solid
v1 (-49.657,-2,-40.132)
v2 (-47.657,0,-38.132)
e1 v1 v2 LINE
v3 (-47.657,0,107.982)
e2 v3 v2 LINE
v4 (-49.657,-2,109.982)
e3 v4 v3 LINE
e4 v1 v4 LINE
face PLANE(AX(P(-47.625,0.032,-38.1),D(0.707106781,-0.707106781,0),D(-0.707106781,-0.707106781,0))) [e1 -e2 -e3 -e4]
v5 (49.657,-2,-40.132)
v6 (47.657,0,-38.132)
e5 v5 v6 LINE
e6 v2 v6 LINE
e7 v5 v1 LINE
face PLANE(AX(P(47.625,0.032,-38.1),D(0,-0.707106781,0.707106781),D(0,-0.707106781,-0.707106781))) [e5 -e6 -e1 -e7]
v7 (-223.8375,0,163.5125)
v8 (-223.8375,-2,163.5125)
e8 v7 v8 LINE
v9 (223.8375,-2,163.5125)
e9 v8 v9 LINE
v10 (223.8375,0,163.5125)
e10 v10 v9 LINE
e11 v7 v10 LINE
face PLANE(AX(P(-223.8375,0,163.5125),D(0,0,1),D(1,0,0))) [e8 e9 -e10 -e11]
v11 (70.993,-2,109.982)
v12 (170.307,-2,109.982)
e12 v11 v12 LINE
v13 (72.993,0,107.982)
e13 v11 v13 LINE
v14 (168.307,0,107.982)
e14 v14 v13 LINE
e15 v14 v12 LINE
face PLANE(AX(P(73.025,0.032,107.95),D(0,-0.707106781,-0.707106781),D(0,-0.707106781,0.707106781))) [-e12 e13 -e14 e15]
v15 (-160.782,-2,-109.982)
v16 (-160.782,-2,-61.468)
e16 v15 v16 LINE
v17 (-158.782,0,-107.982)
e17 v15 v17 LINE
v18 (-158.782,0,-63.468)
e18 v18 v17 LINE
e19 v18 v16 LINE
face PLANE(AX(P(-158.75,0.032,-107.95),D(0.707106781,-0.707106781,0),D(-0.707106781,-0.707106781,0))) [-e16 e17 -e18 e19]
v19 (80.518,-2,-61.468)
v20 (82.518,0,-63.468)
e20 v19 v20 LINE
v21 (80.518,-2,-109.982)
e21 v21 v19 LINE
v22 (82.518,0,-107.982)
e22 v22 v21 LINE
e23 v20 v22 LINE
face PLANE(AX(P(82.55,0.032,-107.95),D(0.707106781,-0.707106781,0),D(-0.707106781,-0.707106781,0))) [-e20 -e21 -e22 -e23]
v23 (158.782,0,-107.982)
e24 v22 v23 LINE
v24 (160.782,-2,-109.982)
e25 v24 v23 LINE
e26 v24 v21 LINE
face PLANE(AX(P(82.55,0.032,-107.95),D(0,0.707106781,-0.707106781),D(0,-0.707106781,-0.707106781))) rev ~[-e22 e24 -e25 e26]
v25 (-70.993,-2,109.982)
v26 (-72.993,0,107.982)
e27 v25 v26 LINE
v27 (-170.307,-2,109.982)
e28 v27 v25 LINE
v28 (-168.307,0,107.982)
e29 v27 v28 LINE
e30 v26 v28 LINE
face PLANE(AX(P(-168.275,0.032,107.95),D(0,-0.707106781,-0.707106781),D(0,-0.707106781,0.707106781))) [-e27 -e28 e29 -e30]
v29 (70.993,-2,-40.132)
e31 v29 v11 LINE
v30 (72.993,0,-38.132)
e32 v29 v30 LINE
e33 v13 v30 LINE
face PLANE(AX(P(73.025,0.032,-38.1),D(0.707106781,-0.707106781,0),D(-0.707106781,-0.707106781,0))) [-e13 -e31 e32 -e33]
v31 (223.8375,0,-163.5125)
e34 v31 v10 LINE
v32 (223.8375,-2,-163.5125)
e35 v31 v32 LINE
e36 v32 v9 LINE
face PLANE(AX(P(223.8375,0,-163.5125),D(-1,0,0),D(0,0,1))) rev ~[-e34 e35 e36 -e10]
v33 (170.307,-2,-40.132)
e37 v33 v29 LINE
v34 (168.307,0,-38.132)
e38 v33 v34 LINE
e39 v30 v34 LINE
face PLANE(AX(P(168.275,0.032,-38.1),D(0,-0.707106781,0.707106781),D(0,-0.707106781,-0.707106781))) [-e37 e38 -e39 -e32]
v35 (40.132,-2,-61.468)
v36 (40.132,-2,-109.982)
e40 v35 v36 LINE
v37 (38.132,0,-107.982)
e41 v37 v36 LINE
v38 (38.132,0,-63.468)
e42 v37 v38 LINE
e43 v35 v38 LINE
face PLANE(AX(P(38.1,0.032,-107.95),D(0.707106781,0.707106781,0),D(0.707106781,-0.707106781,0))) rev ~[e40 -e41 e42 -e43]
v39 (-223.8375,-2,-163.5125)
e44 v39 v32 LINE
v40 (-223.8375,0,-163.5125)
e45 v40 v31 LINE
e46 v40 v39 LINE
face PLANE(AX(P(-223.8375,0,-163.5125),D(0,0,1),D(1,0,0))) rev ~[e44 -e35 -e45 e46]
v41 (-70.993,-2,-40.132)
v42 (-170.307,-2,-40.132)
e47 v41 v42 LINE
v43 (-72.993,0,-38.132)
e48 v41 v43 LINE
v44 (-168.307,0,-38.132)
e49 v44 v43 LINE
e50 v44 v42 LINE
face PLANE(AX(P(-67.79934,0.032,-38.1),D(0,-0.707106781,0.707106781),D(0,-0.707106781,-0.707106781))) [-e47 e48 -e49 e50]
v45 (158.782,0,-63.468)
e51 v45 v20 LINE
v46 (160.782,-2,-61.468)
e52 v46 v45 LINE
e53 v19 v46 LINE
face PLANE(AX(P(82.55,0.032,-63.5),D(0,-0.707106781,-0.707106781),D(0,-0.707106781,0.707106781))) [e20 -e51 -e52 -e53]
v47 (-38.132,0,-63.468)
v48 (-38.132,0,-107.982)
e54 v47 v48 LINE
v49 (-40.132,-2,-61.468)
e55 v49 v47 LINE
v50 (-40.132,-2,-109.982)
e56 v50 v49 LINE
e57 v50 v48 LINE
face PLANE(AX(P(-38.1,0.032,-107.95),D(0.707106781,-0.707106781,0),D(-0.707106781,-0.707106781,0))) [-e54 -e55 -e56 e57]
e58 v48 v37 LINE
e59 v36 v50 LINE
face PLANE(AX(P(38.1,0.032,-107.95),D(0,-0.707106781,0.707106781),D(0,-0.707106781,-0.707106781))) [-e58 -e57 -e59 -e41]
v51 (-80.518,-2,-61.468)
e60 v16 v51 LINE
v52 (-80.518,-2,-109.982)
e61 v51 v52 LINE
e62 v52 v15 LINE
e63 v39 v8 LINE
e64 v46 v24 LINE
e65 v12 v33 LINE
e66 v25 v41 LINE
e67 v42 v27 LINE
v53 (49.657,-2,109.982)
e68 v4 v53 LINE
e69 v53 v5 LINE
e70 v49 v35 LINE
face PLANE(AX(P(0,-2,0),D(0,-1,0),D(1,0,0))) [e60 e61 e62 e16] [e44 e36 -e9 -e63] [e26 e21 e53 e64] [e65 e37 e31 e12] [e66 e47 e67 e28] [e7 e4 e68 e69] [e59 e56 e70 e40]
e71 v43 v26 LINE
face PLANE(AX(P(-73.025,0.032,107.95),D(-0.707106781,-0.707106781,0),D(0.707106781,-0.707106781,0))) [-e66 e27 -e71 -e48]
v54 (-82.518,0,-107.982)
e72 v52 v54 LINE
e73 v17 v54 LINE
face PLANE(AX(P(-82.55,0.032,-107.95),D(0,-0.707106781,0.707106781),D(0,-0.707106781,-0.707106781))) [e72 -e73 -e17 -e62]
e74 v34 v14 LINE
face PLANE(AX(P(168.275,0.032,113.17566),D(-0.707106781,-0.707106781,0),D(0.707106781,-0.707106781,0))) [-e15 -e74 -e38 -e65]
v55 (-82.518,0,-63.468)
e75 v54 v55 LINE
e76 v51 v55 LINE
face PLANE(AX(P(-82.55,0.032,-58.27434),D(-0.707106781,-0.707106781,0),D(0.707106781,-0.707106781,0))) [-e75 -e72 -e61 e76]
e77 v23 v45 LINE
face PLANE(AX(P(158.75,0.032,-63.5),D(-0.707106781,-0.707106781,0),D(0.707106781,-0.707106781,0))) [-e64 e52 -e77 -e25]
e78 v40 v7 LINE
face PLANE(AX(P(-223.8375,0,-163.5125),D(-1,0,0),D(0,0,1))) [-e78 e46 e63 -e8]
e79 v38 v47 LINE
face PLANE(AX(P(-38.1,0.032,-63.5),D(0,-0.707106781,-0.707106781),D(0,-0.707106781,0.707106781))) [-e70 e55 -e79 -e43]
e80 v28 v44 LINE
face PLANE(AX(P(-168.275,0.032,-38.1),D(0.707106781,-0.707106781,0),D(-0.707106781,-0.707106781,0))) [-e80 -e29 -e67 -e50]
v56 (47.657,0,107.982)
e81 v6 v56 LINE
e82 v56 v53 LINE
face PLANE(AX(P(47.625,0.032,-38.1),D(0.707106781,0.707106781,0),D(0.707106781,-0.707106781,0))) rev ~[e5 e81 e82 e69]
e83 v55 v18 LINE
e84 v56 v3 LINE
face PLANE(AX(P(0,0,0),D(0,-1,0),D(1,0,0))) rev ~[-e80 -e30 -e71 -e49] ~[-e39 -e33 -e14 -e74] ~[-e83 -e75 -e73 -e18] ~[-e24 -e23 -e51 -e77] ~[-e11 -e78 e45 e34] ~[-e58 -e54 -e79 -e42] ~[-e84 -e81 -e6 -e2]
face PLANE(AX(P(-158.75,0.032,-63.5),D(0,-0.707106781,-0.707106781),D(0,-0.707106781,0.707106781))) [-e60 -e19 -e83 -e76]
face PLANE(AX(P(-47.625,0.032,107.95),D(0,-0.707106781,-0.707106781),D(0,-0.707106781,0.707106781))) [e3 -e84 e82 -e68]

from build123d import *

# Parameters (mm, degrees)
F0_W          = 447.675
F0_H          = 327.025
F0_W_2        = 76.2
F0_H_2        = 44.45
F0_W_3        = 95.25
F0_H_3        = 146.05
F1_DEPTH      = 2
F2_T1_DEPTH   = 95.25
F2_T3_DEPTH   = 146.05
F2_T5_DEPTH   = 95.25
F2_T7_DEPTH   = 95.25
F2_T9_DEPTH   = 76.2
F2_T11_DEPTH  = 44.45
F2_T13_DEPTH  = 76.2
F2_T15_DEPTH  = 76.2
F2_T21_DEPTH  = 151.2756598315
F2_T25_DEPTH  = 100.4756598315
F2_T32_DEPTH  = 100.4756598315
F2_T36_DEPTH  = 151.2756598315
F2_T43_DEPTH  = 151.2756598315
F2_T47_DEPTH  = 100.4756598315
F2_T54_DEPTH  = 151.2756598315
F2_T58_DEPTH  = 100.4756598315
F2_T65_DEPTH  = 151.2756598315
F2_T69_DEPTH  = 100.4756598315
F2_T76_DEPTH  = 151.2756598315
F2_T80_DEPTH  = 100.4756598315
F2_T87_DEPTH  = 100.4756598315
F2_T91_DEPTH  = 151.2756598315
F2_T98_DEPTH  = 151.2756598315
F2_T102_DEPTH = 100.4756598315
F2_T109_DEPTH = 151.2756598315
F2_T113_DEPTH = 100.4756598315
F2_T120_DEPTH = 100.4756598315
F2_T124_DEPTH = 151.2756598315
F2_T131_DEPTH = 151.2756598315
F2_T135_DEPTH = 100.4756598315
F2_T142_DEPTH = 151.2756598315
F2_T146_DEPTH = 100.4756598315
F2_T153_DEPTH = 49.6756598315
F2_T157_DEPTH = 81.4256598315
F2_T164_DEPTH = 81.4256598315
F2_T168_DEPTH = 49.6756598315
F2_T175_DEPTH = 49.6756598315
F2_T179_DEPTH = 81.4256598315
F2_T186_DEPTH = 49.6756598315
F2_T190_DEPTH = 81.4256598315
F2_T197_DEPTH = 81.4256598315
F2_T201_DEPTH = 49.6756598315
F2_T208_DEPTH = 81.4256598315
F2_T212_DEPTH = 49.6756598315
F2_T219_DEPTH = 49.6756598315
F2_T223_DEPTH = 81.4256598315
F2_T230_DEPTH = 81.4256598315
F2_T234_DEPTH = 49.6756598315
F2_T241_DEPTH = 49.6756598315
F2_T245_DEPTH = 81.4256598315
F2_T252_DEPTH = 81.4256598315
F2_T256_DEPTH = 49.6756598315
F2_T263_DEPTH = 81.4256598315
F2_T267_DEPTH = 49.6756598315
F2_T274_DEPTH = 81.4256598315
F2_T278_DEPTH = 49.6756598315


# Not quite as in the source:
# - a fillet or chamfer that OpenCascade refuses, or shapes differently, is made with other operations: its cross-section is extruded or revolved along the edge and cut away or added


with BuildPart() as f1:
    # F0 (on Front) → F1 (new body)
    with BuildSketch(Plane.XZ):
        Rectangle(F0_W, F0_H)
        with Locations((-120.65, -85.725)):
            Rectangle(F0_W_2, F0_H_2, mode=Mode.SUBTRACT)
        with Locations((0, -85.725)):
            Rectangle(F0_W_2, F0_H_2, mode=Mode.SUBTRACT)
        with Locations((120.65, -85.725)):
            Rectangle(F0_W_2, F0_H_2, mode=Mode.SUBTRACT)
        with Locations((-120.65, 34.925)):
            Rectangle(F0_W_3, F0_H_3, mode=Mode.SUBTRACT)
        with Locations((0, 34.925)):
            Rectangle(F0_W_3, F0_H_3, mode=Mode.SUBTRACT)
        with Locations((120.65, 34.925)):
            Rectangle(F0_W_3, F0_H_3, mode=Mode.SUBTRACT)
    extrude(amount=F1_DEPTH)

    # F2: chamfer of 2.032 on 24 edges, made by hand

    # F2_s2 → F2_t1 (cut)
    with BuildSketch(Plane.YZ.offset(-168.275)):
        Polygon((0.032, 107.95), (-2, 109.982), (-2, 107.95), align=None)
        Polygon((0.032, -38.1), (-2, -40.132), (-2, -38.1), align=None)
    extrude(amount=F2_T1_DEPTH, mode=Mode.SUBTRACT)

    # F2_s4 → F2_t3 (cut)
    with BuildSketch(Plane.XY.offset(-38.1)):
        Polygon((-168.275, 0.032), (-170.307, -2), (-168.275, -2), align=None)
        Polygon((-73.025, 0.032), (-70.993, -2), (-73.025, -2), align=None)
        Polygon((-47.625, 0.032), (-49.657, -2), (-47.625, -2), align=None)
        Polygon((47.625, 0.032), (49.657, -2), (47.625, -2), align=None)
        Polygon((73.025, 0.032), (70.993, -2), (73.025, -2), align=None)
        Polygon((168.275, 0.032), (170.307, -2), (168.275, -2), align=None)
    extrude(amount=F2_T3_DEPTH, mode=Mode.SUBTRACT)

    # F2_s6 → F2_t5 (cut)
    with BuildSketch(Plane.YZ.offset(-47.625)):
        Polygon((0.032, 107.95), (-2, 109.982), (-2, 107.95), align=None)
        Polygon((0.032, -38.1), (-2, -40.132), (-2, -38.1), align=None)
    extrude(amount=F2_T5_DEPTH, mode=Mode.SUBTRACT)

    # F2_s8 → F2_t7 (cut)
    with BuildSketch(Plane.YZ.offset(73.025)):
        Polygon((0.032, -38.1), (-2, -40.132), (-2, -38.1), align=None)
        Polygon((0.032, 107.95), (-2, 109.982), (-2, 107.95), align=None)
    extrude(amount=F2_T7_DEPTH, mode=Mode.SUBTRACT)

    # F2_s10 → F2_t9 (cut)
    with BuildSketch(Plane.YZ.offset(82.55)):
        Polygon((0.032, -63.5), (-2, -61.468), (-2, -63.5), align=None)
        Polygon((0.032, -107.95), (-2, -109.982), (-2, -107.95), align=None)
    extrude(amount=F2_T9_DEPTH, mode=Mode.SUBTRACT)

    # F2_s12 → F2_t11 (cut)
    with BuildSketch(Plane.XY.offset(-107.95)):
        Polygon((158.75, 0.032), (160.782, -2), (158.75, -2), align=None)
        Polygon((82.55, 0.032), (80.518, -2), (82.55, -2), align=None)
        Polygon((38.1, 0.032), (40.132, -2), (38.1, -2), align=None)
        Polygon((-38.1, 0.032), (-40.132, -2), (-38.1, -2), align=None)
        Polygon((-82.55, 0.032), (-80.518, -2), (-82.55, -2), align=None)
        Polygon((-158.75, 0.032), (-160.782, -2), (-158.75, -2), align=None)
    extrude(amount=F2_T11_DEPTH, mode=Mode.SUBTRACT)

    # F2_s14 → F2_t13 (cut)
    with BuildSketch(Plane.YZ.offset(-38.1)):
        Polygon((0.032, -63.5), (-2, -61.468), (-2, -63.5), align=None)
        Polygon((0.032, -107.95), (-2, -109.982), (-2, -107.95), align=None)
    extrude(amount=F2_T13_DEPTH, mode=Mode.SUBTRACT)

    # F2_s16 → F2_t15 (cut)
    with BuildSketch(Plane.YZ.offset(-158.75)):
        Polygon((0.032, -107.95), (-2, -109.982), (-2, -107.95), align=None)
        Polygon((0.032, -63.5), (-2, -61.468), (-2, -63.5), align=None)
    extrude(amount=F2_T15_DEPTH, mode=Mode.SUBTRACT)


with BuildPart() as f2_tool19:
    # F2_s20 → F2_t21 (new body)
    with BuildSketch(Plane.XY.offset(-38.1)):
        Polygon((-168.275, 0.032), (-170.307, -2), (-168.275, -2), align=None)
    extrude(amount=F2_T21_DEPTH)

    split(bisect_by=Plane.XY.offset(107.95), keep=Keep.TOP)


with BuildPart() as f2_tool23:
    # F2_s24 → F2_t25 (new body)
    with BuildSketch(Plane.YZ.offset(-173.5006598315)):
        Polygon((0.032, 107.95), (-2, 109.982), (-2, 107.95), align=None)
    extrude(amount=F2_T25_DEPTH)

    split(bisect_by=Plane.YZ.offset(-168.275), keep=Keep.BOTTOM)


with BuildPart() as f2_tool19_1:
    add(f2_tool19.part)

    # F2_t27: intersect F2_tool23
    add(f2_tool23.part, mode=Mode.INTERSECT)


with BuildPart() as f1_1:
    add(f1.part)

    # F2_t17: cut F2_tool19
    add(f2_tool19_1.part, mode=Mode.SUBTRACT)


with BuildPart() as f2_tool30:
    # F2_s31 → F2_t32 (new body)
    with BuildSketch(Plane.YZ.offset(-168.275)):
        Polygon((0.032, 107.95), (-2, 109.982), (-2, 107.95), align=None)
    extrude(amount=F2_T32_DEPTH)

    split(bisect_by=Plane.YZ.offset(-73.025), keep=Keep.TOP)


with BuildPart() as f2_tool34:
    # F2_s35 → F2_t36 (new body)
    with BuildSketch(Plane.XY.offset(113.1756598315)):
        Polygon((-73.025, 0.032), (-70.993, -2), (-73.025, -2), align=None)
    extrude(amount=-F2_T36_DEPTH)

    split(bisect_by=Plane.XY.offset(107.95), keep=Keep.TOP)


with BuildPart() as f2_tool30_1:
    add(f2_tool30.part)

    # F2_t38: intersect F2_tool34
    add(f2_tool34.part, mode=Mode.INTERSECT)


with BuildPart() as f1_2:
    add(f1_1.part)

    # F2_t28: cut F2_tool30
    add(f2_tool30_1.part, mode=Mode.SUBTRACT)


with BuildPart() as f2_tool41:
    # F2_s42 → F2_t43 (new body)
    with BuildSketch(Plane.XY.offset(-43.3256598315)):
        Polygon((-168.275, 0.032), (-170.307, -2), (-168.275, -2), align=None)
    extrude(amount=F2_T43_DEPTH)

    split(bisect_by=Plane.XY.offset(-38.1), keep=Keep.BOTTOM)


with BuildPart() as f2_tool45:
    # F2_s46 → F2_t47 (new body)
    with BuildSketch(Plane.YZ.offset(-73.025)):
        Polygon((0.032, -38.1), (-2, -40.132), (-2, -38.1), align=None)
    extrude(amount=-F2_T47_DEPTH)

    split(bisect_by=Plane.YZ.offset(-168.275), keep=Keep.BOTTOM)


with BuildPart() as f2_tool41_1:
    add(f2_tool41.part)

    # F2_t49: intersect F2_tool45
    add(f2_tool45.part, mode=Mode.INTERSECT)


with BuildPart() as f1_3:
    add(f1_2.part)

    # F2_t39: cut F2_tool41
    add(f2_tool41_1.part, mode=Mode.SUBTRACT)


with BuildPart() as f2_tool52:
    # F2_s53 → F2_t54 (new body)
    with BuildSketch(Plane.XY.offset(107.95)):
        Polygon((-73.025, 0.032), (-70.993, -2), (-73.025, -2), align=None)
    extrude(amount=-F2_T54_DEPTH)

    split(bisect_by=Plane.XY.offset(-38.1), keep=Keep.BOTTOM)


with BuildPart() as f2_tool56:
    # F2_s57 → F2_t58 (new body)
    with BuildSketch(Plane.YZ.offset(-67.7993401685)):
        Polygon((0.032, -38.1), (-2, -40.132), (-2, -38.1), align=None)
    extrude(amount=-F2_T58_DEPTH)

    split(bisect_by=Plane.YZ.offset(-73.025), keep=Keep.TOP)


with BuildPart() as f2_tool52_1:
    add(f2_tool52.part)

    # F2_t60: intersect F2_tool56
    add(f2_tool56.part, mode=Mode.INTERSECT)


with BuildPart() as f1_4:
    add(f1_3.part)

    # F2_t50: cut F2_tool52
    add(f2_tool52_1.part, mode=Mode.SUBTRACT)


with BuildPart() as f2_tool63:
    # F2_s64 → F2_t65 (new body)
    with BuildSketch(Plane.XY.offset(-38.1)):
        Polygon((-47.625, 0.032), (-49.657, -2), (-47.625, -2), align=None)
    extrude(amount=F2_T65_DEPTH)

    split(bisect_by=Plane.XY.offset(107.95), keep=Keep.TOP)


with BuildPart() as f2_tool67:
    # F2_s68 → F2_t69 (new body)
    with BuildSketch(Plane.YZ.offset(-52.8506598315)):
        Polygon((0.032, 107.95), (-2, 109.982), (-2, 107.95), align=None)
    extrude(amount=F2_T69_DEPTH)

    split(bisect_by=Plane.YZ.offset(-47.625), keep=Keep.BOTTOM)


with BuildPart() as f2_tool63_1:
    add(f2_tool63.part)

    # F2_t71: intersect F2_tool67
    add(f2_tool67.part, mode=Mode.INTERSECT)


with BuildPart() as f1_5:
    add(f1_4.part)

    # F2_t61: cut F2_tool63
    add(f2_tool63_1.part, mode=Mode.SUBTRACT)


with BuildPart() as f2_tool74:
    # F2_s75 → F2_t76 (new body)
    with BuildSketch(Plane.XY.offset(113.1756598315)):
        Polygon((47.625, 0.032), (49.657, -2), (47.625, -2), align=None)
    extrude(amount=-F2_T76_DEPTH)

    split(bisect_by=Plane.XY.offset(107.95), keep=Keep.TOP)


with BuildPart() as f2_tool78:
    # F2_s79 → F2_t80 (new body)
    with BuildSketch(Plane.YZ.offset(-47.625)):
        Polygon((0.032, 107.95), (-2, 109.982), (-2, 107.95), align=None)
    extrude(amount=F2_T80_DEPTH)

    split(bisect_by=Plane.YZ.offset(47.625), keep=Keep.TOP)


with BuildPart() as f2_tool74_1:
    add(f2_tool74.part)

    # F2_t82: intersect F2_tool78
    add(f2_tool78.part, mode=Mode.INTERSECT)


with BuildPart() as f1_6:
    add(f1_5.part)

    # F2_t72: cut F2_tool74
    add(f2_tool74_1.part, mode=Mode.SUBTRACT)


with BuildPart() as f2_tool85:
    # F2_s86 → F2_t87 (new body)
    with BuildSketch(Plane.YZ.offset(47.625)):
        Polygon((0.032, -38.1), (-2, -40.132), (-2, -38.1), align=None)
    extrude(amount=-F2_T87_DEPTH)

    split(bisect_by=Plane.YZ.offset(-47.625), keep=Keep.BOTTOM)


with BuildPart() as f2_tool89:
    # F2_s90 → F2_t91 (new body)
    with BuildSketch(Plane.XY.offset(-43.3256598315)):
        Polygon((-47.625, 0.032), (-49.657, -2), (-47.625, -2), align=None)
    extrude(amount=F2_T91_DEPTH)

    split(bisect_by=Plane.XY.offset(-38.1), keep=Keep.BOTTOM)


with BuildPart() as f2_tool85_1:
    add(f2_tool85.part)

    # F2_t93: intersect F2_tool89
    add(f2_tool89.part, mode=Mode.INTERSECT)


with BuildPart() as f1_7:
    add(f1_6.part)

    # F2_t83: cut F2_tool85
    add(f2_tool85_1.part, mode=Mode.SUBTRACT)


with BuildPart() as f2_tool96:
    # F2_s97 → F2_t98 (new body)
    with BuildSketch(Plane.XY.offset(107.95)):
        Polygon((47.625, 0.032), (49.657, -2), (47.625, -2), align=None)
    extrude(amount=-F2_T98_DEPTH)

    split(bisect_by=Plane.XY.offset(-38.1), keep=Keep.BOTTOM)


with BuildPart() as f2_tool100:
    # F2_s101 → F2_t102 (new body)
    with BuildSketch(Plane.YZ.offset(52.8506598315)):
        Polygon((0.032, -38.1), (-2, -40.132), (-2, -38.1), align=None)
    extrude(amount=-F2_T102_DEPTH)

    split(bisect_by=Plane.YZ.offset(47.625), keep=Keep.TOP)


with BuildPart() as f2_tool96_1:
    add(f2_tool96.part)

    # F2_t104: intersect F2_tool100
    add(f2_tool100.part, mode=Mode.INTERSECT)


with BuildPart() as f1_8:
    add(f1_7.part)

    # F2_t94: cut F2_tool96
    add(f2_tool96_1.part, mode=Mode.SUBTRACT)


with BuildPart() as f2_tool107:
    # F2_s108 → F2_t109 (new body)
    with BuildSketch(Plane.XY.offset(107.95)):
        Polygon((168.275, 0.032), (170.307, -2), (168.275, -2), align=None)
    extrude(amount=-F2_T109_DEPTH)

    split(bisect_by=Plane.XY.offset(-38.1), keep=Keep.BOTTOM)


with BuildPart() as f2_tool111:
    # F2_s112 → F2_t113 (new body)
    with BuildSketch(Plane.YZ.offset(173.5006598315)):
        Polygon((0.032, -38.1), (-2, -40.132), (-2, -38.1), align=None)
    extrude(amount=-F2_T113_DEPTH)

    split(bisect_by=Plane.YZ.offset(168.275), keep=Keep.TOP)


with BuildPart() as f2_tool107_1:
    add(f2_tool107.part)

    # F2_t115: intersect F2_tool111
    add(f2_tool111.part, mode=Mode.INTERSECT)


with BuildPart() as f1_9:
    add(f1_8.part)

    # F2_t105: cut F2_tool107
    add(f2_tool107_1.part, mode=Mode.SUBTRACT)


with BuildPart() as f2_tool118:
    # F2_s119 → F2_t120 (new body)
    with BuildSketch(Plane.YZ.offset(168.275)):
        Polygon((0.032, -38.1), (-2, -40.132), (-2, -38.1), align=None)
    extrude(amount=-F2_T120_DEPTH)

    split(bisect_by=Plane.YZ.offset(73.025), keep=Keep.BOTTOM)


with BuildPart() as f2_tool122:
    # F2_s123 → F2_t124 (new body)
    with BuildSketch(Plane.XY.offset(-43.3256598315)):
        Polygon((73.025, 0.032), (70.993, -2), (73.025, -2), align=None)
    extrude(amount=F2_T124_DEPTH)

    split(bisect_by=Plane.XY.offset(-38.1), keep=Keep.BOTTOM)


with BuildPart() as f2_tool118_1:
    add(f2_tool118.part)

    # F2_t126: intersect F2_tool122
    add(f2_tool122.part, mode=Mode.INTERSECT)


with BuildPart() as f1_10:
    add(f1_9.part)

    # F2_t116: cut F2_tool118
    add(f2_tool118_1.part, mode=Mode.SUBTRACT)


with BuildPart() as f2_tool129:
    # F2_s130 → F2_t131 (new body)
    with BuildSketch(Plane.XY.offset(-38.1)):
        Polygon((73.025, 0.032), (70.993, -2), (73.025, -2), align=None)
    extrude(amount=F2_T131_DEPTH)

    split(bisect_by=Plane.XY.offset(107.95), keep=Keep.TOP)


with BuildPart() as f2_tool133:
    # F2_s134 → F2_t135 (new body)
    with BuildSketch(Plane.YZ.offset(67.7993401685)):
        Polygon((0.032, 107.95), (-2, 109.982), (-2, 107.95), align=None)
    extrude(amount=F2_T135_DEPTH)

    split(bisect_by=Plane.YZ.offset(73.025), keep=Keep.BOTTOM)


with BuildPart() as f2_tool129_1:
    add(f2_tool129.part)

    # F2_t137: intersect F2_tool133
    add(f2_tool133.part, mode=Mode.INTERSECT)


with BuildPart() as f1_11:
    add(f1_10.part)

    # F2_t127: cut F2_tool129
    add(f2_tool129_1.part, mode=Mode.SUBTRACT)


with BuildPart() as f2_tool140:
    # F2_s141 → F2_t142 (new body)
    with BuildSketch(Plane.XY.offset(113.1756598315)):
        Polygon((168.275, 0.032), (170.307, -2), (168.275, -2), align=None)
    extrude(amount=-F2_T142_DEPTH)

    split(bisect_by=Plane.XY.offset(107.95), keep=Keep.TOP)


with BuildPart() as f2_tool144:
    # F2_s145 → F2_t146 (new body)
    with BuildSketch(Plane.YZ.offset(73.025)):
        Polygon((0.032, 107.95), (-2, 109.982), (-2, 107.95), align=None)
    extrude(amount=F2_T146_DEPTH)

    split(bisect_by=Plane.YZ.offset(168.275), keep=Keep.TOP)


with BuildPart() as f2_tool140_1:
    add(f2_tool140.part)

    # F2_t148: intersect F2_tool144
    add(f2_tool144.part, mode=Mode.INTERSECT)


with BuildPart() as f1_12:
    add(f1_11.part)

    # F2_t138: cut F2_tool140
    add(f2_tool140_1.part, mode=Mode.SUBTRACT)


with BuildPart() as f2_tool151:
    # F2_s152 → F2_t153 (new body)
    with BuildSketch(Plane.XY.offset(-107.95)):
        Polygon((82.55, 0.032), (80.518, -2), (82.55, -2), align=None)
    extrude(amount=F2_T153_DEPTH)

    split(bisect_by=Plane.XY.offset(-63.5), keep=Keep.TOP)


with BuildPart() as f2_tool155:
    # F2_s156 → F2_t157 (new body)
    with BuildSketch(Plane.YZ.offset(77.3243401685)):
        Polygon((0.032, -63.5), (-2, -61.468), (-2, -63.5), align=None)
    extrude(amount=F2_T157_DEPTH)

    split(bisect_by=Plane.YZ.offset(82.55), keep=Keep.BOTTOM)


with BuildPart() as f2_tool151_1:
    add(f2_tool151.part)

    # F2_t159: intersect F2_tool155
    add(f2_tool155.part, mode=Mode.INTERSECT)


with BuildPart() as f1_13:
    add(f1_12.part)

    # F2_t149: cut F2_tool151
    add(f2_tool151_1.part, mode=Mode.SUBTRACT)


with BuildPart() as f2_tool162:
    # F2_s163 → F2_t164 (new body)
    with BuildSketch(Plane.YZ.offset(82.55)):
        Polygon((0.032, -63.5), (-2, -61.468), (-2, -63.5), align=None)
    extrude(amount=F2_T164_DEPTH)

    split(bisect_by=Plane.YZ.offset(158.75), keep=Keep.TOP)


with BuildPart() as f2_tool166:
    # F2_s167 → F2_t168 (new body)
    with BuildSketch(Plane.XY.offset(-58.2743401685)):
        Polygon((158.75, 0.032), (160.782, -2), (158.75, -2), align=None)
    extrude(amount=-F2_T168_DEPTH)

    split(bisect_by=Plane.XY.offset(-63.5), keep=Keep.TOP)


with BuildPart() as f2_tool162_1:
    add(f2_tool162.part)

    # F2_t170: intersect F2_tool166
    add(f2_tool166.part, mode=Mode.INTERSECT)


with BuildPart() as f1_14:
    add(f1_13.part)

    # F2_t160: cut F2_tool162
    add(f2_tool162_1.part, mode=Mode.SUBTRACT)


with BuildPart() as f2_tool173:
    # F2_s174 → F2_t175 (new body)
    with BuildSketch(Plane.XY.offset(-63.5)):
        Polygon((158.75, 0.032), (160.782, -2), (158.75, -2), align=None)
    extrude(amount=-F2_T175_DEPTH)

    split(bisect_by=Plane.XY.offset(-107.95), keep=Keep.BOTTOM)


with BuildPart() as f2_tool177:
    # F2_s178 → F2_t179 (new body)
    with BuildSketch(Plane.YZ.offset(163.9756598315)):
        Polygon((0.032, -107.95), (-2, -109.982), (-2, -107.95), align=None)
    extrude(amount=-F2_T179_DEPTH)

    split(bisect_by=Plane.YZ.offset(158.75), keep=Keep.TOP)


with BuildPart() as f2_tool173_1:
    add(f2_tool173.part)

    # F2_t181: intersect F2_tool177
    add(f2_tool177.part, mode=Mode.INTERSECT)


with BuildPart() as f1_15:
    add(f1_14.part)

    # F2_t171: cut F2_tool173
    add(f2_tool173_1.part, mode=Mode.SUBTRACT)


with BuildPart() as f2_tool184:
    # F2_s185 → F2_t186 (new body)
    with BuildSketch(Plane.XY.offset(-113.1756598315)):
        Polygon((82.55, 0.032), (80.518, -2), (82.55, -2), align=None)
    extrude(amount=F2_T186_DEPTH)

    split(bisect_by=Plane.XY.offset(-107.95), keep=Keep.BOTTOM)


with BuildPart() as f2_tool188:
    # F2_s189 → F2_t190 (new body)
    with BuildSketch(Plane.YZ.offset(158.75)):
        Polygon((0.032, -107.95), (-2, -109.982), (-2, -107.95), align=None)
    extrude(amount=-F2_T190_DEPTH)

    split(bisect_by=Plane.YZ.offset(82.55), keep=Keep.BOTTOM)


with BuildPart() as f2_tool184_1:
    add(f2_tool184.part)

    # F2_t192: intersect F2_tool188
    add(f2_tool188.part, mode=Mode.INTERSECT)


with BuildPart() as f1_16:
    add(f1_15.part)

    # F2_t182: cut F2_tool184
    add(f2_tool184_1.part, mode=Mode.SUBTRACT)


with BuildPart() as f2_tool195:
    # F2_s196 → F2_t197 (new body)
    with BuildSketch(Plane.YZ.offset(-38.1)):
        Polygon((0.032, -63.5), (-2, -61.468), (-2, -63.5), align=None)
    extrude(amount=F2_T197_DEPTH)

    split(bisect_by=Plane.YZ.offset(38.1), keep=Keep.TOP)


with BuildPart() as f2_tool199:
    # F2_s200 → F2_t201 (new body)
    with BuildSketch(Plane.XY.offset(-58.2743401685)):
        Polygon((38.1, 0.032), (40.132, -2), (38.1, -2), align=None)
    extrude(amount=-F2_T201_DEPTH)

    split(bisect_by=Plane.XY.offset(-63.5), keep=Keep.TOP)


with BuildPart() as f2_tool195_1:
    add(f2_tool195.part)

    # F2_t203: intersect F2_tool199
    add(f2_tool199.part, mode=Mode.INTERSECT)


with BuildPart() as f1_17:
    add(f1_16.part)

    # F2_t193: cut F2_tool195
    add(f2_tool195_1.part, mode=Mode.SUBTRACT)


with BuildPart() as f2_tool206:
    # F2_s207 → F2_t208 (new body)
    with BuildSketch(Plane.YZ.offset(43.3256598315)):
        Polygon((0.032, -107.95), (-2, -109.982), (-2, -107.95), align=None)
    extrude(amount=-F2_T208_DEPTH)

    split(bisect_by=Plane.YZ.offset(38.1), keep=Keep.TOP)


with BuildPart() as f2_tool210:
    # F2_s211 → F2_t212 (new body)
    with BuildSketch(Plane.XY.offset(-63.5)):
        Polygon((38.1, 0.032), (40.132, -2), (38.1, -2), align=None)
    extrude(amount=-F2_T212_DEPTH)

    split(bisect_by=Plane.XY.offset(-107.95), keep=Keep.BOTTOM)


with BuildPart() as f2_tool206_1:
    add(f2_tool206.part)

    # F2_t214: intersect F2_tool210
    add(f2_tool210.part, mode=Mode.INTERSECT)


with BuildPart() as f1_18:
    add(f1_17.part)

    # F2_t204: cut F2_tool206
    add(f2_tool206_1.part, mode=Mode.SUBTRACT)


with BuildPart() as f2_tool217:
    # F2_s218 → F2_t219 (new body)
    with BuildSketch(Plane.XY.offset(-107.95)):
        Polygon((-38.1, 0.032), (-40.132, -2), (-38.1, -2), align=None)
    extrude(amount=F2_T219_DEPTH)

    split(bisect_by=Plane.XY.offset(-63.5), keep=Keep.TOP)


with BuildPart() as f2_tool221:
    # F2_s222 → F2_t223 (new body)
    with BuildSketch(Plane.YZ.offset(-43.3256598315)):
        Polygon((0.032, -63.5), (-2, -61.468), (-2, -63.5), align=None)
    extrude(amount=F2_T223_DEPTH)

    split(bisect_by=Plane.YZ.offset(-38.1), keep=Keep.BOTTOM)


with BuildPart() as f2_tool217_1:
    add(f2_tool217.part)

    # F2_t225: intersect F2_tool221
    add(f2_tool221.part, mode=Mode.INTERSECT)


with BuildPart() as f1_19:
    add(f1_18.part)

    # F2_t215: cut F2_tool217
    add(f2_tool217_1.part, mode=Mode.SUBTRACT)


with BuildPart() as f2_tool228:
    # F2_s229 → F2_t230 (new body)
    with BuildSketch(Plane.YZ.offset(38.1)):
        Polygon((0.032, -107.95), (-2, -109.982), (-2, -107.95), align=None)
    extrude(amount=-F2_T230_DEPTH)

    split(bisect_by=Plane.YZ.offset(-38.1), keep=Keep.BOTTOM)


with BuildPart() as f2_tool232:
    # F2_s233 → F2_t234 (new body)
    with BuildSketch(Plane.XY.offset(-113.1756598315)):
        Polygon((-38.1, 0.032), (-40.132, -2), (-38.1, -2), align=None)
    extrude(amount=F2_T234_DEPTH)

    split(bisect_by=Plane.XY.offset(-107.95), keep=Keep.BOTTOM)


with BuildPart() as f2_tool228_1:
    add(f2_tool228.part)

    # F2_t236: intersect F2_tool232
    add(f2_tool232.part, mode=Mode.INTERSECT)


with BuildPart() as f1_20:
    add(f1_19.part)

    # F2_t226: cut F2_tool228
    add(f2_tool228_1.part, mode=Mode.SUBTRACT)


with BuildPart() as f2_tool239:
    # F2_s240 → F2_t241 (new body)
    with BuildSketch(Plane.XY.offset(-63.5)):
        Polygon((-82.55, 0.032), (-80.518, -2), (-82.55, -2), align=None)
    extrude(amount=-F2_T241_DEPTH)

    split(bisect_by=Plane.XY.offset(-107.95), keep=Keep.BOTTOM)


with BuildPart() as f2_tool243:
    # F2_s244 → F2_t245 (new body)
    with BuildSketch(Plane.YZ.offset(-77.3243401685)):
        Polygon((0.032, -107.95), (-2, -109.982), (-2, -107.95), align=None)
    extrude(amount=-F2_T245_DEPTH)

    split(bisect_by=Plane.YZ.offset(-82.55), keep=Keep.TOP)


with BuildPart() as f2_tool239_1:
    add(f2_tool239.part)

    # F2_t247: intersect F2_tool243
    add(f2_tool243.part, mode=Mode.INTERSECT)


with BuildPart() as f1_21:
    add(f1_20.part)

    # F2_t237: cut F2_tool239
    add(f2_tool239_1.part, mode=Mode.SUBTRACT)


with BuildPart() as f2_tool250:
    # F2_s251 → F2_t252 (new body)
    with BuildSketch(Plane.YZ.offset(-82.55)):
        Polygon((0.032, -107.95), (-2, -109.982), (-2, -107.95), align=None)
    extrude(amount=-F2_T252_DEPTH)

    split(bisect_by=Plane.YZ.offset(-158.75), keep=Keep.BOTTOM)


with BuildPart() as f2_tool254:
    # F2_s255 → F2_t256 (new body)
    with BuildSketch(Plane.XY.offset(-113.1756598315)):
        Polygon((-158.75, 0.032), (-160.782, -2), (-158.75, -2), align=None)
    extrude(amount=F2_T256_DEPTH)

    split(bisect_by=Plane.XY.offset(-107.95), keep=Keep.BOTTOM)


with BuildPart() as f2_tool250_1:
    add(f2_tool250.part)

    # F2_t258: intersect F2_tool254
    add(f2_tool254.part, mode=Mode.INTERSECT)


with BuildPart() as f1_22:
    add(f1_21.part)

    # F2_t248: cut F2_tool250
    add(f2_tool250_1.part, mode=Mode.SUBTRACT)


with BuildPart() as f2_tool261:
    # F2_s262 → F2_t263 (new body)
    with BuildSketch(Plane.YZ.offset(-158.75)):
        Polygon((0.032, -63.5), (-2, -61.468), (-2, -63.5), align=None)
    extrude(amount=F2_T263_DEPTH)

    split(bisect_by=Plane.YZ.offset(-82.55), keep=Keep.TOP)


with BuildPart() as f2_tool265:
    # F2_s266 → F2_t267 (new body)
    with BuildSketch(Plane.XY.offset(-58.2743401685)):
        Polygon((-82.55, 0.032), (-80.518, -2), (-82.55, -2), align=None)
    extrude(amount=-F2_T267_DEPTH)

    split(bisect_by=Plane.XY.offset(-63.5), keep=Keep.TOP)


with BuildPart() as f2_tool261_1:
    add(f2_tool261.part)

    # F2_t269: intersect F2_tool265
    add(f2_tool265.part, mode=Mode.INTERSECT)


with BuildPart() as f1_23:
    add(f1_22.part)

    # F2_t259: cut F2_tool261
    add(f2_tool261_1.part, mode=Mode.SUBTRACT)


with BuildPart() as f2_tool272:
    # F2_s273 → F2_t274 (new body)
    with BuildSketch(Plane.YZ.offset(-163.9756598315)):
        Polygon((0.032, -63.5), (-2, -61.468), (-2, -63.5), align=None)
    extrude(amount=F2_T274_DEPTH)

    split(bisect_by=Plane.YZ.offset(-158.75), keep=Keep.BOTTOM)


with BuildPart() as f2_tool276:
    # F2_s277 → F2_t278 (new body)
    with BuildSketch(Plane.XY.offset(-107.95)):
        Polygon((-158.75, 0.032), (-160.782, -2), (-158.75, -2), align=None)
    extrude(amount=F2_T278_DEPTH)

    split(bisect_by=Plane.XY.offset(-63.5), keep=Keep.TOP)


with BuildPart() as f2_tool272_1:
    add(f2_tool272.part)

    # F2_t280: intersect F2_tool276
    add(f2_tool276.part, mode=Mode.INTERSECT)


with BuildPart() as f1_24:
    add(f1_23.part)

    # F2_t270: cut F2_tool272
    add(f2_tool272_1.part, mode=Mode.SUBTRACT)


solid = f1_24.part
